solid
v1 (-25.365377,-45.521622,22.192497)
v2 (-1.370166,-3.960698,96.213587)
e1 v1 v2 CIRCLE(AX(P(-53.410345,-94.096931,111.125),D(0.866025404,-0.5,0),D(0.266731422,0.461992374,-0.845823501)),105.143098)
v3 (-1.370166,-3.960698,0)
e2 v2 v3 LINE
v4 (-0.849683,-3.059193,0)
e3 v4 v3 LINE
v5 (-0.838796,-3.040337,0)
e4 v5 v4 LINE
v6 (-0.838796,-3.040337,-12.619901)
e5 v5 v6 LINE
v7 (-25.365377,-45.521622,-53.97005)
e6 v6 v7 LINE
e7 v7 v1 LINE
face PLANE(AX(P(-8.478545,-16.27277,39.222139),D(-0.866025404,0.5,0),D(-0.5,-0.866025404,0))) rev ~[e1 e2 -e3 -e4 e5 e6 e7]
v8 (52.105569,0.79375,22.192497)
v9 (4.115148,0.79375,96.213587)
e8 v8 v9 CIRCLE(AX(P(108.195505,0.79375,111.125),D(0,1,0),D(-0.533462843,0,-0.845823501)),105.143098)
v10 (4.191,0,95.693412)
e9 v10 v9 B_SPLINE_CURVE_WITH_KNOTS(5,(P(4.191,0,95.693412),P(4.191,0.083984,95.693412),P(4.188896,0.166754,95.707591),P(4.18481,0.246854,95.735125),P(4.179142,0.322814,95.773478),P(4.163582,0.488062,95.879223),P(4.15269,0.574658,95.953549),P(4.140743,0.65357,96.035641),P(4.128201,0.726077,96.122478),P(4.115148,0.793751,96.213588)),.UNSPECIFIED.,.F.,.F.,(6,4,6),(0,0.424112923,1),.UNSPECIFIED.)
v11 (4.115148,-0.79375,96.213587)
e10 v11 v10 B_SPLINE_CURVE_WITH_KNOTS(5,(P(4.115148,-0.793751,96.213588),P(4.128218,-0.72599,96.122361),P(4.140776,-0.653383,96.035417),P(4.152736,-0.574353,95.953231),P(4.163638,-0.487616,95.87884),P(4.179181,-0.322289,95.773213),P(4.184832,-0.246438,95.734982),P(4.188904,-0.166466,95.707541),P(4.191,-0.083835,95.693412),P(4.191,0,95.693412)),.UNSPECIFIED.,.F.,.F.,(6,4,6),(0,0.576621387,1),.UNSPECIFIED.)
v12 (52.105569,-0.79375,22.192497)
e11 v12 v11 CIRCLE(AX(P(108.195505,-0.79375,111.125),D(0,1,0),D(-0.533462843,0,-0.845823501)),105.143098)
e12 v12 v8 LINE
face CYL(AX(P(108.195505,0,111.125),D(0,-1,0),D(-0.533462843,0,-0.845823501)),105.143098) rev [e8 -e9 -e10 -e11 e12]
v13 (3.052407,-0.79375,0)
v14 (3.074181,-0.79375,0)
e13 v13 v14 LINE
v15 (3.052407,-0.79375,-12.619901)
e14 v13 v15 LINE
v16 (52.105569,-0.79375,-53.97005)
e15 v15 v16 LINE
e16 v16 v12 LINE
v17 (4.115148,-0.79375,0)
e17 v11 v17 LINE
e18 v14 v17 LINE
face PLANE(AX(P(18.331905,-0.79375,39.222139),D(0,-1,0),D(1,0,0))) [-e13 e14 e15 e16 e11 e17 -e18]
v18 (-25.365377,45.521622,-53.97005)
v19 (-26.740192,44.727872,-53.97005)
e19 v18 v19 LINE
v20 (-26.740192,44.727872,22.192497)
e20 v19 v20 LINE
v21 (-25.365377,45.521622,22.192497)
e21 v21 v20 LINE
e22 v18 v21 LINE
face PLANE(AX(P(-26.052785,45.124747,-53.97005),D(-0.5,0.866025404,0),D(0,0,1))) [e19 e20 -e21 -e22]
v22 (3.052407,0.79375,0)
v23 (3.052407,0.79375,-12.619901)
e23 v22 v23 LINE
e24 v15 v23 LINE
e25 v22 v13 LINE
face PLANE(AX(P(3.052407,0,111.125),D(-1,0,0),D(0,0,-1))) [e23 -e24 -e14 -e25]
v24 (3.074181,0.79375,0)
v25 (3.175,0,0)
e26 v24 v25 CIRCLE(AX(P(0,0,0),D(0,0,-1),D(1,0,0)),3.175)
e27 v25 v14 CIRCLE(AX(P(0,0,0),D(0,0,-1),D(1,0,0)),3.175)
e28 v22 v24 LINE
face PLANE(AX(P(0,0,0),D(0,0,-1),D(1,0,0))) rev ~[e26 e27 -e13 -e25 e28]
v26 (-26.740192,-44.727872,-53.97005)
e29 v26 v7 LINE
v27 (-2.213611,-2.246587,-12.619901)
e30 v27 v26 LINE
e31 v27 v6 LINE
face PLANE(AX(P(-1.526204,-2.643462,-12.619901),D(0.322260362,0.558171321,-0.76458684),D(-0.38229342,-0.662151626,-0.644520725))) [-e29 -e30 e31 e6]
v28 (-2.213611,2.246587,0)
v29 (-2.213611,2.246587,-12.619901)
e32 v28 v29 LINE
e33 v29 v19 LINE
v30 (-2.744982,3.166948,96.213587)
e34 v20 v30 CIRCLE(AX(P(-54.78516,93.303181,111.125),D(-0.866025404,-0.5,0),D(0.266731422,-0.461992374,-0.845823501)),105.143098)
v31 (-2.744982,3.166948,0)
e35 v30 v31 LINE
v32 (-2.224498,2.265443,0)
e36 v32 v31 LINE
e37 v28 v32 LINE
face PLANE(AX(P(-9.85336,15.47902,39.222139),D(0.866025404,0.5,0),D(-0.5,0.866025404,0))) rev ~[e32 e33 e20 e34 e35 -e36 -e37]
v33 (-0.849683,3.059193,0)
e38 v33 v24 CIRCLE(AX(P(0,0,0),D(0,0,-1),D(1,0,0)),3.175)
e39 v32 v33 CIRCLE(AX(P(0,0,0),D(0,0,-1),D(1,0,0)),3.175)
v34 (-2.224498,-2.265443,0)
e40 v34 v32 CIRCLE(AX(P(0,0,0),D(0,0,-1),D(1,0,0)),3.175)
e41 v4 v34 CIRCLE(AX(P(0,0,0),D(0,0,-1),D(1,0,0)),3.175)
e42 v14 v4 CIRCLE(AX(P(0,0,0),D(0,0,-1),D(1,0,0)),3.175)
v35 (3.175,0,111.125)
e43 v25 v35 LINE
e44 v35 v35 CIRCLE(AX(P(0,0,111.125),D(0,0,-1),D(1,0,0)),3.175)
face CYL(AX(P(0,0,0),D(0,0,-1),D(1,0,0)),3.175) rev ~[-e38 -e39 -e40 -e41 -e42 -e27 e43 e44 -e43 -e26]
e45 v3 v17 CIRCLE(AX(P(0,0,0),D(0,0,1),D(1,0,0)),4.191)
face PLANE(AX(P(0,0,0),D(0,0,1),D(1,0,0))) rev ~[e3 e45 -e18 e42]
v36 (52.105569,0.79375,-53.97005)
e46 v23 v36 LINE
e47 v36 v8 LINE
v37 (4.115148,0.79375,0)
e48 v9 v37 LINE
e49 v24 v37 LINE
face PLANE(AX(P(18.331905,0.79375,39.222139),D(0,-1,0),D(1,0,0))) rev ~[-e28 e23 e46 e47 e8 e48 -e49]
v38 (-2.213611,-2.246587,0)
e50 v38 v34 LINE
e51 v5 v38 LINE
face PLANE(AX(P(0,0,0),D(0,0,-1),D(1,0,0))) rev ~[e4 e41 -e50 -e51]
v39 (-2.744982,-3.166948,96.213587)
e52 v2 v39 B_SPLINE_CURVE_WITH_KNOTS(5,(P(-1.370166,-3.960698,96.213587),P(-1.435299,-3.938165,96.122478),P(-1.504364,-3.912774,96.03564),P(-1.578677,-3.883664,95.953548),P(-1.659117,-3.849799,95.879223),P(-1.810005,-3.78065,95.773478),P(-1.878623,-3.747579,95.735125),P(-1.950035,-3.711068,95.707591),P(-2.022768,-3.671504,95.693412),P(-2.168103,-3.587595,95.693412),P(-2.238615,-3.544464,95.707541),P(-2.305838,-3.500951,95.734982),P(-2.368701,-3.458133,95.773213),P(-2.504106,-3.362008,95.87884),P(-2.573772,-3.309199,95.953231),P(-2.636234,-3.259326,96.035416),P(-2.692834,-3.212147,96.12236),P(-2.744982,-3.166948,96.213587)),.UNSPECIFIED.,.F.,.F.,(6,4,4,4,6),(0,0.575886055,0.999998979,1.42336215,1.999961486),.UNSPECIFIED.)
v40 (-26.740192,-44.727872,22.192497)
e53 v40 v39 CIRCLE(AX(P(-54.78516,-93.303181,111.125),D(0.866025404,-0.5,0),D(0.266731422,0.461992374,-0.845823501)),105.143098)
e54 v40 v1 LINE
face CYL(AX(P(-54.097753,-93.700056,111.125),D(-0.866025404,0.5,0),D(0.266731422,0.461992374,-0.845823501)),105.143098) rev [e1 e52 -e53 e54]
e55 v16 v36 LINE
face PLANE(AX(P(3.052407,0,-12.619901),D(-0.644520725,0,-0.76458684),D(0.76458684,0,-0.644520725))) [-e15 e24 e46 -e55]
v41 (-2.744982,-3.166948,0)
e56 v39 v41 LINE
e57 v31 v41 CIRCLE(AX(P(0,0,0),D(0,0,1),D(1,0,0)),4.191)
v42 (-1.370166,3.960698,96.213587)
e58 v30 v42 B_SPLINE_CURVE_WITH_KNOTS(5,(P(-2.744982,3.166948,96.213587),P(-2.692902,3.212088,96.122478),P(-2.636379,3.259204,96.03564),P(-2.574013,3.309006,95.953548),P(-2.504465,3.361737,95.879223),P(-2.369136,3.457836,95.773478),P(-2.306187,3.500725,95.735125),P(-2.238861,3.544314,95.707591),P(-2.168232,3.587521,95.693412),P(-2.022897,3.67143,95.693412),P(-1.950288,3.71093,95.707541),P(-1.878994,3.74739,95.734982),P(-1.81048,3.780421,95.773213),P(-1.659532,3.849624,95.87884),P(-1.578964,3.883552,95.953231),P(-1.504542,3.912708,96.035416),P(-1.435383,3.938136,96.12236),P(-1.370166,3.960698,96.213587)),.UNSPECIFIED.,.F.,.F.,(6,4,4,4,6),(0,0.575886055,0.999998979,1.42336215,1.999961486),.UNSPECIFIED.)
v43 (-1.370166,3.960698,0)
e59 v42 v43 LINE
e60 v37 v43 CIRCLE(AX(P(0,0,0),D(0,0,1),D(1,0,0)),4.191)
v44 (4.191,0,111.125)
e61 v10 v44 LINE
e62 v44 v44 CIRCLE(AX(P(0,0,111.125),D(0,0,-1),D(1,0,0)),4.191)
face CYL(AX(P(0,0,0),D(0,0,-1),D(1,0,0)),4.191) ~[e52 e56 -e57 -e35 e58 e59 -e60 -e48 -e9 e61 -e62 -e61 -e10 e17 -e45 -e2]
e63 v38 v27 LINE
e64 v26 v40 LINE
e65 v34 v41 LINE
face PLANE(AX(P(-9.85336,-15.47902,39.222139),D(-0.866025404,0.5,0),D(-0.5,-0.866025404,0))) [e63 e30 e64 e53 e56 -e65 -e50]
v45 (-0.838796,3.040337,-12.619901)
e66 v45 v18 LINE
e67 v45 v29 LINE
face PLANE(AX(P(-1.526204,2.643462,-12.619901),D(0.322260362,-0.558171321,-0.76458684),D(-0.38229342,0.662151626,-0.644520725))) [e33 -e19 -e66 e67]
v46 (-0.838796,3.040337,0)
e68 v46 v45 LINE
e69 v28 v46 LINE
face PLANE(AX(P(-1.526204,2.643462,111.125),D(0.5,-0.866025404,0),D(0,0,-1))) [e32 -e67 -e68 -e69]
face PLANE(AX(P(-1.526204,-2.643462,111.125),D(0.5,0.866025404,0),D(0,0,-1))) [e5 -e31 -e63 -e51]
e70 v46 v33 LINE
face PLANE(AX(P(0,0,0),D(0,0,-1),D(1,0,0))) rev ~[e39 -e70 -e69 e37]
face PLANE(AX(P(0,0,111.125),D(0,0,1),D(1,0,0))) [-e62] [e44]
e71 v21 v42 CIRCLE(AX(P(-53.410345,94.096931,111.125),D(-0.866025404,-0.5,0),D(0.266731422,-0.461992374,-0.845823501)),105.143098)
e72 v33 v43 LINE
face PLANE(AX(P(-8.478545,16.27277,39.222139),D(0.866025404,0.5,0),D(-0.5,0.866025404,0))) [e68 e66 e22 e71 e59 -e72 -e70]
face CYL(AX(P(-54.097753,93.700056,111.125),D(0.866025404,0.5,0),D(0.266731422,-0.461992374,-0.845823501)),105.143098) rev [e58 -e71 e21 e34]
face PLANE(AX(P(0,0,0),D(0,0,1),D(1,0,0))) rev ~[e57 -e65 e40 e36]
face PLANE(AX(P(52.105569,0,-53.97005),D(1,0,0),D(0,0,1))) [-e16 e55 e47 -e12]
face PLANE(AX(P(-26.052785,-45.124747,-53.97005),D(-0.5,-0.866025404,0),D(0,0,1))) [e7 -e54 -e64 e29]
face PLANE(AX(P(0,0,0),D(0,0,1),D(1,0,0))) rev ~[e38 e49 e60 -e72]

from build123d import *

# Parameters (mm, degrees)
F0_R          = 4.191
F0_R_2        = 2.921
F1_DEPTH      = 111.125
F3_DEPTH      = 0.79375
F3_DEPTH_BACK = 0.79375
F4_COUNT      = 3
F5_D          = 6.35
F5_DEPTH      = 111.1260001


# Not quite as in the source:
# - a length typed as a fraction of an inch, garbled in the dataset ("3 / 203.2 mm" for 3/8 in), is restored


with BuildPart() as f1:
    # F0 (on Top) → F1 (new body)
    with BuildSketch(Plane.XY):
        Circle(F0_R)
        Circle(F0_R_2, mode=Mode.SUBTRACT)
    extrude(amount=F1_DEPTH)

    # F2 (on Front) → F3 (join, two sides)
    with BuildSketch(Plane.XZ) as f3_sk:
        with BuildLine():
            ThreePointArc((52.1055692807, 22.1924969852), (16.1288428569, 60.3431066176), (3.05240741, 111.125))
            Line((3.05240741, 111.125), (3.05240741, -12.6199012697))
            Line((3.05240741, -12.6199012697), (52.1055692807, -12.6199012697))
            Line((52.1055692807, -12.6199012697), (52.1055692807, 22.1924969852))
        make_face()
        Polygon((52.1055692807, -12.6199012697), (3.05240741, -12.6199012697), (52.1055692807, -53.9700498879), align=None)
    extrude(amount=F3_DEPTH)
    extrude(f3_sk.sketch, amount=-F3_DEPTH_BACK)

    # F4: F1 ×3 about axis
    f4_axis = Axis((0, 0, 24.9059423804), (0, 0, -1))


with BuildPart() as f1_1:
    add(f1.part)
    for i in range(1, F4_COUNT):
        add(f1.part.rotate(f4_axis, i * 360 / F4_COUNT))

    # F5 (through all, one way)
    with BuildSketch(Plane(origin=(0, 0, 0), x_dir=(1, 0, 0), z_dir=(0, 0, -1))):
        with Locations((0, 0)):
            Circle(F5_D / 2)
    extrude(amount=-F5_DEPTH, mode=Mode.SUBTRACT)


solid = f1_1.part
